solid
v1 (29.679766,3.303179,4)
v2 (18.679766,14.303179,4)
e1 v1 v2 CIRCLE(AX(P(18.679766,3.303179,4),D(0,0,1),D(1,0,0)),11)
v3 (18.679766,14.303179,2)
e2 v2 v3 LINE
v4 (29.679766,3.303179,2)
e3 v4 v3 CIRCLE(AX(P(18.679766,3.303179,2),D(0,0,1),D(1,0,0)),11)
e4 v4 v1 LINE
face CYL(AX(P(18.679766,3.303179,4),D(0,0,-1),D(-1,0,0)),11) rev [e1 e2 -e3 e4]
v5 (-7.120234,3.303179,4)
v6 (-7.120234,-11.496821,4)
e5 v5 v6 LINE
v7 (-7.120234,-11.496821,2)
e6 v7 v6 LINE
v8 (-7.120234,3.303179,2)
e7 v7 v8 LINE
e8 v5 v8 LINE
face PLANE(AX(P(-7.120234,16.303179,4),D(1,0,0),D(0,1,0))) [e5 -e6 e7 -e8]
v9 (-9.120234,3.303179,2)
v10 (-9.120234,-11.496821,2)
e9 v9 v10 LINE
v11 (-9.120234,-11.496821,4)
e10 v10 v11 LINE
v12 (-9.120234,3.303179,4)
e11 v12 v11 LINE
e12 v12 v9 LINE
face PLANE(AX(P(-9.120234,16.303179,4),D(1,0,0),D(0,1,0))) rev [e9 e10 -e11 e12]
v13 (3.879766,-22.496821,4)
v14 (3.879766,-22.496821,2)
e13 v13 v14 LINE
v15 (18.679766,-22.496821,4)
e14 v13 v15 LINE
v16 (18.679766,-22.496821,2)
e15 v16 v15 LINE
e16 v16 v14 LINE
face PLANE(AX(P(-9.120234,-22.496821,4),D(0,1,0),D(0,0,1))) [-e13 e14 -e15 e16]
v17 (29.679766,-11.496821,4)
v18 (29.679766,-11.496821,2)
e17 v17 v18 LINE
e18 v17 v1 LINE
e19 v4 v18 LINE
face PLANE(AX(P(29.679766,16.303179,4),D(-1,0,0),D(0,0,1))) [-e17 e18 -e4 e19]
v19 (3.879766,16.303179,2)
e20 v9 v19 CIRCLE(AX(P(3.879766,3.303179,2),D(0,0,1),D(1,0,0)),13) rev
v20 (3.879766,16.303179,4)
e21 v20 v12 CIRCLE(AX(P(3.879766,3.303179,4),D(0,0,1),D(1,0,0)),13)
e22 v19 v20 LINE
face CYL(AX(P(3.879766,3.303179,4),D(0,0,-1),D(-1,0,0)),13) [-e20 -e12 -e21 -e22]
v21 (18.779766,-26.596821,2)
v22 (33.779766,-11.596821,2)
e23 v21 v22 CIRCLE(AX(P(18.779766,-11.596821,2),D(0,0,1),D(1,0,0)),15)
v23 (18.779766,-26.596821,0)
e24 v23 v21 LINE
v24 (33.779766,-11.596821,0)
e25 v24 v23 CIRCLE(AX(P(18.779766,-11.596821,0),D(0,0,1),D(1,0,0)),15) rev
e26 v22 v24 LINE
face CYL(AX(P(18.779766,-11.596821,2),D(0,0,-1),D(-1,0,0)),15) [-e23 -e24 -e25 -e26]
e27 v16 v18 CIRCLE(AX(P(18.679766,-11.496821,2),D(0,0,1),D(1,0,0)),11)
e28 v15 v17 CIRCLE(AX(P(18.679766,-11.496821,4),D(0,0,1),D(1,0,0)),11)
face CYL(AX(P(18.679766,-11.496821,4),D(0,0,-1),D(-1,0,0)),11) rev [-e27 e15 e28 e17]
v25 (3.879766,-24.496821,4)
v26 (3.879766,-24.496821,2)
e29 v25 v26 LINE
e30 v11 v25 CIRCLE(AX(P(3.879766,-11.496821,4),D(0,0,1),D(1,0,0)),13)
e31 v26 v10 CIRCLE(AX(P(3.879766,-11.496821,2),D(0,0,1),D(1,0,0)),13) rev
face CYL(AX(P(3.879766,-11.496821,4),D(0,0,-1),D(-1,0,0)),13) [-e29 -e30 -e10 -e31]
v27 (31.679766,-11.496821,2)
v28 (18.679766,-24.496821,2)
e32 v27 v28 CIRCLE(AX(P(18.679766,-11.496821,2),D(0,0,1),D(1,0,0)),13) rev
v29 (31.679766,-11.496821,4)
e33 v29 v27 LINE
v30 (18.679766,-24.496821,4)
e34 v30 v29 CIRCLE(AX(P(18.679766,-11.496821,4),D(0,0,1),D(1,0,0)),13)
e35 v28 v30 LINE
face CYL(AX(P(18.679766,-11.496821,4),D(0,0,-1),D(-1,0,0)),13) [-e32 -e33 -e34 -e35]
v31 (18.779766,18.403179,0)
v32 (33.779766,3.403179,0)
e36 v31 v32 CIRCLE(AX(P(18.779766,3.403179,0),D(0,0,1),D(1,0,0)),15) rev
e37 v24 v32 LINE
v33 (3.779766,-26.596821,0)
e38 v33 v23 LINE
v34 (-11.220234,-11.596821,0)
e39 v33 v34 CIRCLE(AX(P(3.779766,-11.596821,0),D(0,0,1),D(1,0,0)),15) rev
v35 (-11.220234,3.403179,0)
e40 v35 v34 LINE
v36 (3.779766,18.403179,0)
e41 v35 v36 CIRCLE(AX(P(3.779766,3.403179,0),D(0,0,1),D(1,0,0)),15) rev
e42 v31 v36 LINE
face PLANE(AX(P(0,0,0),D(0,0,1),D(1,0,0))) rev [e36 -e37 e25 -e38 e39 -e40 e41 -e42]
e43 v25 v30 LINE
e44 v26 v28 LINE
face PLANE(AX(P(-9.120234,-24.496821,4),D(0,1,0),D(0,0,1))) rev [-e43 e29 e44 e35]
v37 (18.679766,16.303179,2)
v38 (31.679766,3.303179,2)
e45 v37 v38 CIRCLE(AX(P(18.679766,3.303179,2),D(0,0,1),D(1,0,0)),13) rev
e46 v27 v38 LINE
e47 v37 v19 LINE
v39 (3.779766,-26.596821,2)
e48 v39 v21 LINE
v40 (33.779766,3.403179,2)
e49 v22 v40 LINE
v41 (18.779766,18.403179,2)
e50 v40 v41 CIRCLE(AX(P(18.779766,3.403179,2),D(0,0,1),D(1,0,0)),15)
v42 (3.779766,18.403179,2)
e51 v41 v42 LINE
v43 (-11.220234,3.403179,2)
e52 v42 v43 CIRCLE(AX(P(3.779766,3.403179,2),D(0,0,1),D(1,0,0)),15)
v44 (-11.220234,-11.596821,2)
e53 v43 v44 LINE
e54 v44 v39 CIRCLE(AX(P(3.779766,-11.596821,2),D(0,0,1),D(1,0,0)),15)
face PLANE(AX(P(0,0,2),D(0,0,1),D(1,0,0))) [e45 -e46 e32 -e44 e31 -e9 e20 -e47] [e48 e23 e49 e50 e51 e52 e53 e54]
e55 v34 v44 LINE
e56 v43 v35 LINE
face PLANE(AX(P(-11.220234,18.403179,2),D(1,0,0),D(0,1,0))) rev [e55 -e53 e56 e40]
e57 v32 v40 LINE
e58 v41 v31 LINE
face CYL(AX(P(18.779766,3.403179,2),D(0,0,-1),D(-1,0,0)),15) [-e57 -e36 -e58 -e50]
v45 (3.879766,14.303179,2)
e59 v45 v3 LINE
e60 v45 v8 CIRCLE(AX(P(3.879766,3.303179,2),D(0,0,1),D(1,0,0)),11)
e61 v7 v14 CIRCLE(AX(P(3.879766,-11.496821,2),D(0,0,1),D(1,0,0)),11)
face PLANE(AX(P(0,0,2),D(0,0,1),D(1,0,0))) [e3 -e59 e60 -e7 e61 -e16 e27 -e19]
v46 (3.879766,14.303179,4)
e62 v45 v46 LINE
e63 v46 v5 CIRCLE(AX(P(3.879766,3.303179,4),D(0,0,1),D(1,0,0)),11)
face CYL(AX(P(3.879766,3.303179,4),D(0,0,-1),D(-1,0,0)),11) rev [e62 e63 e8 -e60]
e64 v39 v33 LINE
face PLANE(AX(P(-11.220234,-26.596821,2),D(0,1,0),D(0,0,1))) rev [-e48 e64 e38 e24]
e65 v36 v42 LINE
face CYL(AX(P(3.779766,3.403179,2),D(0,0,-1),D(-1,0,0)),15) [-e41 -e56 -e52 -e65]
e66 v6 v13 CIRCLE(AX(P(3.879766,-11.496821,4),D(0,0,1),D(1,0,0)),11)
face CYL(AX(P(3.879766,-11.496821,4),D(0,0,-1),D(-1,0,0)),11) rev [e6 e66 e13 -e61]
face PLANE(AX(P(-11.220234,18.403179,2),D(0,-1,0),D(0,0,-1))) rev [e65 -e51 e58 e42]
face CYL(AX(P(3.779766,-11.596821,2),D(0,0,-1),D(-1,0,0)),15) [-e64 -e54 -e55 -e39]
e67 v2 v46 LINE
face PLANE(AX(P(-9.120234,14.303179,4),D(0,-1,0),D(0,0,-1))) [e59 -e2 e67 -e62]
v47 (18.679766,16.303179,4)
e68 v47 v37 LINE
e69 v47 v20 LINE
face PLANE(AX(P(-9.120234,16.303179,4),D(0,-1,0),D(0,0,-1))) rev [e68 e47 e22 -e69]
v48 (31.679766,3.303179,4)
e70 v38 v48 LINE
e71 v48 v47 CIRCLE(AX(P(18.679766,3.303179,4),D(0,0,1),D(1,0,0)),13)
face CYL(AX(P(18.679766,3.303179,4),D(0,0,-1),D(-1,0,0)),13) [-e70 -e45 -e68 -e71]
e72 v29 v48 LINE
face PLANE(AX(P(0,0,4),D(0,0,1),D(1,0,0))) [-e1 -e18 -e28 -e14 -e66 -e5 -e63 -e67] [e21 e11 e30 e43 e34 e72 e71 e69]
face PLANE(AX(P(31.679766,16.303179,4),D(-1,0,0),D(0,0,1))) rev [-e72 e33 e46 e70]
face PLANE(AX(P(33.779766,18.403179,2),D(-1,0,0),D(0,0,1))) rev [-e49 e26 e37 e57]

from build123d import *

# Parameters (mm, degrees)
SKETCH_1_W      = 45
SKETCH_1_H      = 45
EXTRUDE_1_DEPTH = 2
FILLET_1_R      = 15
SKETCH_2_W      = 40.8
SKETCH_2_H      = 40.8
EXTRUDE_2_DEPTH = 2
FILLET_2_R      = 13
SHELL_1_T       = -2


with BuildPart() as part:
    # 스케치1 → 보스-돌출1 (new body)
    with BuildSketch(Plane.XY):
        with Locations((11.279766248, -4.096820809)):
            Rectangle(SKETCH_1_W, SKETCH_1_H)
    extrude(amount=EXTRUDE_1_DEPTH)

    # 필렛1
    fillet_1_edges = [part.edges().sort_by_distance(p)[0] for p in [
        (-11.220233752, 18.403179191, 1),
        (33.779766248, 18.403179191, 1),
        (33.779766248, -26.596820809, 1),
        (-11.220233752, -26.596820809, 1),
    ]]
    fillet(fillet_1_edges, radius=FILLET_1_R)

    # 스케치2 → 보스-돌출2 (add)
    with BuildSketch(Plane.XY.offset(2)):
        with Locations((11.279766248, -4.096820809)):
            Rectangle(SKETCH_2_W, SKETCH_2_H)
    extrude(amount=EXTRUDE_2_DEPTH)

    # 필렛2
    # the kernel refuses this fillet: 13 mm, written as the material it takes off along each edge
    with BuildSketch(Plane(origin=(31.679766248, -24.496820809, 2), x_dir=(0, 1, 0), z_dir=(0, 0, 1)), Plane(origin=(31.679766248, 16.303179191, 2), x_dir=(-1, 0, 0), z_dir=(0, 0, 1))) as fillet_2_piece_1:
        with BuildLine():
            CenterArc((FILLET_2_R, FILLET_2_R), FILLET_2_R, 180, 90)
            Line((0, FILLET_2_R), (0, 0))
            Line((0, 0), (FILLET_2_R, 0))
        make_face()
    extrude(amount=34.5, mode=Mode.SUBTRACT)
    with BuildSketch(Plane(origin=(-9.120233752, 16.303179191, 2), x_dir=(1, 0, 0), z_dir=(0, 0, 1)), Plane(origin=(-9.120233752, -24.496820809, 2), x_dir=(0, 1, 0), z_dir=(0, 0, 1))) as fillet_2_piece_2:
        with BuildLine():
            CenterArc((FILLET_2_R, -FILLET_2_R), FILLET_2_R, 90, 90)
            Line((0, -FILLET_2_R), (0, 0))
            Line((0, 0), (FILLET_2_R, 0))
        make_face()
    extrude(amount=34.5, mode=Mode.SUBTRACT)

    # 쉘1
    shell_1_openings = [part.faces().sort_by_distance(p)[0] for p in [
        (11.279766248, -4.096820809, 4),
    ]]
    offset(amount=SHELL_1_T, openings=shell_1_openings, kind=Kind.INTERSECTION)


solid = part.part
